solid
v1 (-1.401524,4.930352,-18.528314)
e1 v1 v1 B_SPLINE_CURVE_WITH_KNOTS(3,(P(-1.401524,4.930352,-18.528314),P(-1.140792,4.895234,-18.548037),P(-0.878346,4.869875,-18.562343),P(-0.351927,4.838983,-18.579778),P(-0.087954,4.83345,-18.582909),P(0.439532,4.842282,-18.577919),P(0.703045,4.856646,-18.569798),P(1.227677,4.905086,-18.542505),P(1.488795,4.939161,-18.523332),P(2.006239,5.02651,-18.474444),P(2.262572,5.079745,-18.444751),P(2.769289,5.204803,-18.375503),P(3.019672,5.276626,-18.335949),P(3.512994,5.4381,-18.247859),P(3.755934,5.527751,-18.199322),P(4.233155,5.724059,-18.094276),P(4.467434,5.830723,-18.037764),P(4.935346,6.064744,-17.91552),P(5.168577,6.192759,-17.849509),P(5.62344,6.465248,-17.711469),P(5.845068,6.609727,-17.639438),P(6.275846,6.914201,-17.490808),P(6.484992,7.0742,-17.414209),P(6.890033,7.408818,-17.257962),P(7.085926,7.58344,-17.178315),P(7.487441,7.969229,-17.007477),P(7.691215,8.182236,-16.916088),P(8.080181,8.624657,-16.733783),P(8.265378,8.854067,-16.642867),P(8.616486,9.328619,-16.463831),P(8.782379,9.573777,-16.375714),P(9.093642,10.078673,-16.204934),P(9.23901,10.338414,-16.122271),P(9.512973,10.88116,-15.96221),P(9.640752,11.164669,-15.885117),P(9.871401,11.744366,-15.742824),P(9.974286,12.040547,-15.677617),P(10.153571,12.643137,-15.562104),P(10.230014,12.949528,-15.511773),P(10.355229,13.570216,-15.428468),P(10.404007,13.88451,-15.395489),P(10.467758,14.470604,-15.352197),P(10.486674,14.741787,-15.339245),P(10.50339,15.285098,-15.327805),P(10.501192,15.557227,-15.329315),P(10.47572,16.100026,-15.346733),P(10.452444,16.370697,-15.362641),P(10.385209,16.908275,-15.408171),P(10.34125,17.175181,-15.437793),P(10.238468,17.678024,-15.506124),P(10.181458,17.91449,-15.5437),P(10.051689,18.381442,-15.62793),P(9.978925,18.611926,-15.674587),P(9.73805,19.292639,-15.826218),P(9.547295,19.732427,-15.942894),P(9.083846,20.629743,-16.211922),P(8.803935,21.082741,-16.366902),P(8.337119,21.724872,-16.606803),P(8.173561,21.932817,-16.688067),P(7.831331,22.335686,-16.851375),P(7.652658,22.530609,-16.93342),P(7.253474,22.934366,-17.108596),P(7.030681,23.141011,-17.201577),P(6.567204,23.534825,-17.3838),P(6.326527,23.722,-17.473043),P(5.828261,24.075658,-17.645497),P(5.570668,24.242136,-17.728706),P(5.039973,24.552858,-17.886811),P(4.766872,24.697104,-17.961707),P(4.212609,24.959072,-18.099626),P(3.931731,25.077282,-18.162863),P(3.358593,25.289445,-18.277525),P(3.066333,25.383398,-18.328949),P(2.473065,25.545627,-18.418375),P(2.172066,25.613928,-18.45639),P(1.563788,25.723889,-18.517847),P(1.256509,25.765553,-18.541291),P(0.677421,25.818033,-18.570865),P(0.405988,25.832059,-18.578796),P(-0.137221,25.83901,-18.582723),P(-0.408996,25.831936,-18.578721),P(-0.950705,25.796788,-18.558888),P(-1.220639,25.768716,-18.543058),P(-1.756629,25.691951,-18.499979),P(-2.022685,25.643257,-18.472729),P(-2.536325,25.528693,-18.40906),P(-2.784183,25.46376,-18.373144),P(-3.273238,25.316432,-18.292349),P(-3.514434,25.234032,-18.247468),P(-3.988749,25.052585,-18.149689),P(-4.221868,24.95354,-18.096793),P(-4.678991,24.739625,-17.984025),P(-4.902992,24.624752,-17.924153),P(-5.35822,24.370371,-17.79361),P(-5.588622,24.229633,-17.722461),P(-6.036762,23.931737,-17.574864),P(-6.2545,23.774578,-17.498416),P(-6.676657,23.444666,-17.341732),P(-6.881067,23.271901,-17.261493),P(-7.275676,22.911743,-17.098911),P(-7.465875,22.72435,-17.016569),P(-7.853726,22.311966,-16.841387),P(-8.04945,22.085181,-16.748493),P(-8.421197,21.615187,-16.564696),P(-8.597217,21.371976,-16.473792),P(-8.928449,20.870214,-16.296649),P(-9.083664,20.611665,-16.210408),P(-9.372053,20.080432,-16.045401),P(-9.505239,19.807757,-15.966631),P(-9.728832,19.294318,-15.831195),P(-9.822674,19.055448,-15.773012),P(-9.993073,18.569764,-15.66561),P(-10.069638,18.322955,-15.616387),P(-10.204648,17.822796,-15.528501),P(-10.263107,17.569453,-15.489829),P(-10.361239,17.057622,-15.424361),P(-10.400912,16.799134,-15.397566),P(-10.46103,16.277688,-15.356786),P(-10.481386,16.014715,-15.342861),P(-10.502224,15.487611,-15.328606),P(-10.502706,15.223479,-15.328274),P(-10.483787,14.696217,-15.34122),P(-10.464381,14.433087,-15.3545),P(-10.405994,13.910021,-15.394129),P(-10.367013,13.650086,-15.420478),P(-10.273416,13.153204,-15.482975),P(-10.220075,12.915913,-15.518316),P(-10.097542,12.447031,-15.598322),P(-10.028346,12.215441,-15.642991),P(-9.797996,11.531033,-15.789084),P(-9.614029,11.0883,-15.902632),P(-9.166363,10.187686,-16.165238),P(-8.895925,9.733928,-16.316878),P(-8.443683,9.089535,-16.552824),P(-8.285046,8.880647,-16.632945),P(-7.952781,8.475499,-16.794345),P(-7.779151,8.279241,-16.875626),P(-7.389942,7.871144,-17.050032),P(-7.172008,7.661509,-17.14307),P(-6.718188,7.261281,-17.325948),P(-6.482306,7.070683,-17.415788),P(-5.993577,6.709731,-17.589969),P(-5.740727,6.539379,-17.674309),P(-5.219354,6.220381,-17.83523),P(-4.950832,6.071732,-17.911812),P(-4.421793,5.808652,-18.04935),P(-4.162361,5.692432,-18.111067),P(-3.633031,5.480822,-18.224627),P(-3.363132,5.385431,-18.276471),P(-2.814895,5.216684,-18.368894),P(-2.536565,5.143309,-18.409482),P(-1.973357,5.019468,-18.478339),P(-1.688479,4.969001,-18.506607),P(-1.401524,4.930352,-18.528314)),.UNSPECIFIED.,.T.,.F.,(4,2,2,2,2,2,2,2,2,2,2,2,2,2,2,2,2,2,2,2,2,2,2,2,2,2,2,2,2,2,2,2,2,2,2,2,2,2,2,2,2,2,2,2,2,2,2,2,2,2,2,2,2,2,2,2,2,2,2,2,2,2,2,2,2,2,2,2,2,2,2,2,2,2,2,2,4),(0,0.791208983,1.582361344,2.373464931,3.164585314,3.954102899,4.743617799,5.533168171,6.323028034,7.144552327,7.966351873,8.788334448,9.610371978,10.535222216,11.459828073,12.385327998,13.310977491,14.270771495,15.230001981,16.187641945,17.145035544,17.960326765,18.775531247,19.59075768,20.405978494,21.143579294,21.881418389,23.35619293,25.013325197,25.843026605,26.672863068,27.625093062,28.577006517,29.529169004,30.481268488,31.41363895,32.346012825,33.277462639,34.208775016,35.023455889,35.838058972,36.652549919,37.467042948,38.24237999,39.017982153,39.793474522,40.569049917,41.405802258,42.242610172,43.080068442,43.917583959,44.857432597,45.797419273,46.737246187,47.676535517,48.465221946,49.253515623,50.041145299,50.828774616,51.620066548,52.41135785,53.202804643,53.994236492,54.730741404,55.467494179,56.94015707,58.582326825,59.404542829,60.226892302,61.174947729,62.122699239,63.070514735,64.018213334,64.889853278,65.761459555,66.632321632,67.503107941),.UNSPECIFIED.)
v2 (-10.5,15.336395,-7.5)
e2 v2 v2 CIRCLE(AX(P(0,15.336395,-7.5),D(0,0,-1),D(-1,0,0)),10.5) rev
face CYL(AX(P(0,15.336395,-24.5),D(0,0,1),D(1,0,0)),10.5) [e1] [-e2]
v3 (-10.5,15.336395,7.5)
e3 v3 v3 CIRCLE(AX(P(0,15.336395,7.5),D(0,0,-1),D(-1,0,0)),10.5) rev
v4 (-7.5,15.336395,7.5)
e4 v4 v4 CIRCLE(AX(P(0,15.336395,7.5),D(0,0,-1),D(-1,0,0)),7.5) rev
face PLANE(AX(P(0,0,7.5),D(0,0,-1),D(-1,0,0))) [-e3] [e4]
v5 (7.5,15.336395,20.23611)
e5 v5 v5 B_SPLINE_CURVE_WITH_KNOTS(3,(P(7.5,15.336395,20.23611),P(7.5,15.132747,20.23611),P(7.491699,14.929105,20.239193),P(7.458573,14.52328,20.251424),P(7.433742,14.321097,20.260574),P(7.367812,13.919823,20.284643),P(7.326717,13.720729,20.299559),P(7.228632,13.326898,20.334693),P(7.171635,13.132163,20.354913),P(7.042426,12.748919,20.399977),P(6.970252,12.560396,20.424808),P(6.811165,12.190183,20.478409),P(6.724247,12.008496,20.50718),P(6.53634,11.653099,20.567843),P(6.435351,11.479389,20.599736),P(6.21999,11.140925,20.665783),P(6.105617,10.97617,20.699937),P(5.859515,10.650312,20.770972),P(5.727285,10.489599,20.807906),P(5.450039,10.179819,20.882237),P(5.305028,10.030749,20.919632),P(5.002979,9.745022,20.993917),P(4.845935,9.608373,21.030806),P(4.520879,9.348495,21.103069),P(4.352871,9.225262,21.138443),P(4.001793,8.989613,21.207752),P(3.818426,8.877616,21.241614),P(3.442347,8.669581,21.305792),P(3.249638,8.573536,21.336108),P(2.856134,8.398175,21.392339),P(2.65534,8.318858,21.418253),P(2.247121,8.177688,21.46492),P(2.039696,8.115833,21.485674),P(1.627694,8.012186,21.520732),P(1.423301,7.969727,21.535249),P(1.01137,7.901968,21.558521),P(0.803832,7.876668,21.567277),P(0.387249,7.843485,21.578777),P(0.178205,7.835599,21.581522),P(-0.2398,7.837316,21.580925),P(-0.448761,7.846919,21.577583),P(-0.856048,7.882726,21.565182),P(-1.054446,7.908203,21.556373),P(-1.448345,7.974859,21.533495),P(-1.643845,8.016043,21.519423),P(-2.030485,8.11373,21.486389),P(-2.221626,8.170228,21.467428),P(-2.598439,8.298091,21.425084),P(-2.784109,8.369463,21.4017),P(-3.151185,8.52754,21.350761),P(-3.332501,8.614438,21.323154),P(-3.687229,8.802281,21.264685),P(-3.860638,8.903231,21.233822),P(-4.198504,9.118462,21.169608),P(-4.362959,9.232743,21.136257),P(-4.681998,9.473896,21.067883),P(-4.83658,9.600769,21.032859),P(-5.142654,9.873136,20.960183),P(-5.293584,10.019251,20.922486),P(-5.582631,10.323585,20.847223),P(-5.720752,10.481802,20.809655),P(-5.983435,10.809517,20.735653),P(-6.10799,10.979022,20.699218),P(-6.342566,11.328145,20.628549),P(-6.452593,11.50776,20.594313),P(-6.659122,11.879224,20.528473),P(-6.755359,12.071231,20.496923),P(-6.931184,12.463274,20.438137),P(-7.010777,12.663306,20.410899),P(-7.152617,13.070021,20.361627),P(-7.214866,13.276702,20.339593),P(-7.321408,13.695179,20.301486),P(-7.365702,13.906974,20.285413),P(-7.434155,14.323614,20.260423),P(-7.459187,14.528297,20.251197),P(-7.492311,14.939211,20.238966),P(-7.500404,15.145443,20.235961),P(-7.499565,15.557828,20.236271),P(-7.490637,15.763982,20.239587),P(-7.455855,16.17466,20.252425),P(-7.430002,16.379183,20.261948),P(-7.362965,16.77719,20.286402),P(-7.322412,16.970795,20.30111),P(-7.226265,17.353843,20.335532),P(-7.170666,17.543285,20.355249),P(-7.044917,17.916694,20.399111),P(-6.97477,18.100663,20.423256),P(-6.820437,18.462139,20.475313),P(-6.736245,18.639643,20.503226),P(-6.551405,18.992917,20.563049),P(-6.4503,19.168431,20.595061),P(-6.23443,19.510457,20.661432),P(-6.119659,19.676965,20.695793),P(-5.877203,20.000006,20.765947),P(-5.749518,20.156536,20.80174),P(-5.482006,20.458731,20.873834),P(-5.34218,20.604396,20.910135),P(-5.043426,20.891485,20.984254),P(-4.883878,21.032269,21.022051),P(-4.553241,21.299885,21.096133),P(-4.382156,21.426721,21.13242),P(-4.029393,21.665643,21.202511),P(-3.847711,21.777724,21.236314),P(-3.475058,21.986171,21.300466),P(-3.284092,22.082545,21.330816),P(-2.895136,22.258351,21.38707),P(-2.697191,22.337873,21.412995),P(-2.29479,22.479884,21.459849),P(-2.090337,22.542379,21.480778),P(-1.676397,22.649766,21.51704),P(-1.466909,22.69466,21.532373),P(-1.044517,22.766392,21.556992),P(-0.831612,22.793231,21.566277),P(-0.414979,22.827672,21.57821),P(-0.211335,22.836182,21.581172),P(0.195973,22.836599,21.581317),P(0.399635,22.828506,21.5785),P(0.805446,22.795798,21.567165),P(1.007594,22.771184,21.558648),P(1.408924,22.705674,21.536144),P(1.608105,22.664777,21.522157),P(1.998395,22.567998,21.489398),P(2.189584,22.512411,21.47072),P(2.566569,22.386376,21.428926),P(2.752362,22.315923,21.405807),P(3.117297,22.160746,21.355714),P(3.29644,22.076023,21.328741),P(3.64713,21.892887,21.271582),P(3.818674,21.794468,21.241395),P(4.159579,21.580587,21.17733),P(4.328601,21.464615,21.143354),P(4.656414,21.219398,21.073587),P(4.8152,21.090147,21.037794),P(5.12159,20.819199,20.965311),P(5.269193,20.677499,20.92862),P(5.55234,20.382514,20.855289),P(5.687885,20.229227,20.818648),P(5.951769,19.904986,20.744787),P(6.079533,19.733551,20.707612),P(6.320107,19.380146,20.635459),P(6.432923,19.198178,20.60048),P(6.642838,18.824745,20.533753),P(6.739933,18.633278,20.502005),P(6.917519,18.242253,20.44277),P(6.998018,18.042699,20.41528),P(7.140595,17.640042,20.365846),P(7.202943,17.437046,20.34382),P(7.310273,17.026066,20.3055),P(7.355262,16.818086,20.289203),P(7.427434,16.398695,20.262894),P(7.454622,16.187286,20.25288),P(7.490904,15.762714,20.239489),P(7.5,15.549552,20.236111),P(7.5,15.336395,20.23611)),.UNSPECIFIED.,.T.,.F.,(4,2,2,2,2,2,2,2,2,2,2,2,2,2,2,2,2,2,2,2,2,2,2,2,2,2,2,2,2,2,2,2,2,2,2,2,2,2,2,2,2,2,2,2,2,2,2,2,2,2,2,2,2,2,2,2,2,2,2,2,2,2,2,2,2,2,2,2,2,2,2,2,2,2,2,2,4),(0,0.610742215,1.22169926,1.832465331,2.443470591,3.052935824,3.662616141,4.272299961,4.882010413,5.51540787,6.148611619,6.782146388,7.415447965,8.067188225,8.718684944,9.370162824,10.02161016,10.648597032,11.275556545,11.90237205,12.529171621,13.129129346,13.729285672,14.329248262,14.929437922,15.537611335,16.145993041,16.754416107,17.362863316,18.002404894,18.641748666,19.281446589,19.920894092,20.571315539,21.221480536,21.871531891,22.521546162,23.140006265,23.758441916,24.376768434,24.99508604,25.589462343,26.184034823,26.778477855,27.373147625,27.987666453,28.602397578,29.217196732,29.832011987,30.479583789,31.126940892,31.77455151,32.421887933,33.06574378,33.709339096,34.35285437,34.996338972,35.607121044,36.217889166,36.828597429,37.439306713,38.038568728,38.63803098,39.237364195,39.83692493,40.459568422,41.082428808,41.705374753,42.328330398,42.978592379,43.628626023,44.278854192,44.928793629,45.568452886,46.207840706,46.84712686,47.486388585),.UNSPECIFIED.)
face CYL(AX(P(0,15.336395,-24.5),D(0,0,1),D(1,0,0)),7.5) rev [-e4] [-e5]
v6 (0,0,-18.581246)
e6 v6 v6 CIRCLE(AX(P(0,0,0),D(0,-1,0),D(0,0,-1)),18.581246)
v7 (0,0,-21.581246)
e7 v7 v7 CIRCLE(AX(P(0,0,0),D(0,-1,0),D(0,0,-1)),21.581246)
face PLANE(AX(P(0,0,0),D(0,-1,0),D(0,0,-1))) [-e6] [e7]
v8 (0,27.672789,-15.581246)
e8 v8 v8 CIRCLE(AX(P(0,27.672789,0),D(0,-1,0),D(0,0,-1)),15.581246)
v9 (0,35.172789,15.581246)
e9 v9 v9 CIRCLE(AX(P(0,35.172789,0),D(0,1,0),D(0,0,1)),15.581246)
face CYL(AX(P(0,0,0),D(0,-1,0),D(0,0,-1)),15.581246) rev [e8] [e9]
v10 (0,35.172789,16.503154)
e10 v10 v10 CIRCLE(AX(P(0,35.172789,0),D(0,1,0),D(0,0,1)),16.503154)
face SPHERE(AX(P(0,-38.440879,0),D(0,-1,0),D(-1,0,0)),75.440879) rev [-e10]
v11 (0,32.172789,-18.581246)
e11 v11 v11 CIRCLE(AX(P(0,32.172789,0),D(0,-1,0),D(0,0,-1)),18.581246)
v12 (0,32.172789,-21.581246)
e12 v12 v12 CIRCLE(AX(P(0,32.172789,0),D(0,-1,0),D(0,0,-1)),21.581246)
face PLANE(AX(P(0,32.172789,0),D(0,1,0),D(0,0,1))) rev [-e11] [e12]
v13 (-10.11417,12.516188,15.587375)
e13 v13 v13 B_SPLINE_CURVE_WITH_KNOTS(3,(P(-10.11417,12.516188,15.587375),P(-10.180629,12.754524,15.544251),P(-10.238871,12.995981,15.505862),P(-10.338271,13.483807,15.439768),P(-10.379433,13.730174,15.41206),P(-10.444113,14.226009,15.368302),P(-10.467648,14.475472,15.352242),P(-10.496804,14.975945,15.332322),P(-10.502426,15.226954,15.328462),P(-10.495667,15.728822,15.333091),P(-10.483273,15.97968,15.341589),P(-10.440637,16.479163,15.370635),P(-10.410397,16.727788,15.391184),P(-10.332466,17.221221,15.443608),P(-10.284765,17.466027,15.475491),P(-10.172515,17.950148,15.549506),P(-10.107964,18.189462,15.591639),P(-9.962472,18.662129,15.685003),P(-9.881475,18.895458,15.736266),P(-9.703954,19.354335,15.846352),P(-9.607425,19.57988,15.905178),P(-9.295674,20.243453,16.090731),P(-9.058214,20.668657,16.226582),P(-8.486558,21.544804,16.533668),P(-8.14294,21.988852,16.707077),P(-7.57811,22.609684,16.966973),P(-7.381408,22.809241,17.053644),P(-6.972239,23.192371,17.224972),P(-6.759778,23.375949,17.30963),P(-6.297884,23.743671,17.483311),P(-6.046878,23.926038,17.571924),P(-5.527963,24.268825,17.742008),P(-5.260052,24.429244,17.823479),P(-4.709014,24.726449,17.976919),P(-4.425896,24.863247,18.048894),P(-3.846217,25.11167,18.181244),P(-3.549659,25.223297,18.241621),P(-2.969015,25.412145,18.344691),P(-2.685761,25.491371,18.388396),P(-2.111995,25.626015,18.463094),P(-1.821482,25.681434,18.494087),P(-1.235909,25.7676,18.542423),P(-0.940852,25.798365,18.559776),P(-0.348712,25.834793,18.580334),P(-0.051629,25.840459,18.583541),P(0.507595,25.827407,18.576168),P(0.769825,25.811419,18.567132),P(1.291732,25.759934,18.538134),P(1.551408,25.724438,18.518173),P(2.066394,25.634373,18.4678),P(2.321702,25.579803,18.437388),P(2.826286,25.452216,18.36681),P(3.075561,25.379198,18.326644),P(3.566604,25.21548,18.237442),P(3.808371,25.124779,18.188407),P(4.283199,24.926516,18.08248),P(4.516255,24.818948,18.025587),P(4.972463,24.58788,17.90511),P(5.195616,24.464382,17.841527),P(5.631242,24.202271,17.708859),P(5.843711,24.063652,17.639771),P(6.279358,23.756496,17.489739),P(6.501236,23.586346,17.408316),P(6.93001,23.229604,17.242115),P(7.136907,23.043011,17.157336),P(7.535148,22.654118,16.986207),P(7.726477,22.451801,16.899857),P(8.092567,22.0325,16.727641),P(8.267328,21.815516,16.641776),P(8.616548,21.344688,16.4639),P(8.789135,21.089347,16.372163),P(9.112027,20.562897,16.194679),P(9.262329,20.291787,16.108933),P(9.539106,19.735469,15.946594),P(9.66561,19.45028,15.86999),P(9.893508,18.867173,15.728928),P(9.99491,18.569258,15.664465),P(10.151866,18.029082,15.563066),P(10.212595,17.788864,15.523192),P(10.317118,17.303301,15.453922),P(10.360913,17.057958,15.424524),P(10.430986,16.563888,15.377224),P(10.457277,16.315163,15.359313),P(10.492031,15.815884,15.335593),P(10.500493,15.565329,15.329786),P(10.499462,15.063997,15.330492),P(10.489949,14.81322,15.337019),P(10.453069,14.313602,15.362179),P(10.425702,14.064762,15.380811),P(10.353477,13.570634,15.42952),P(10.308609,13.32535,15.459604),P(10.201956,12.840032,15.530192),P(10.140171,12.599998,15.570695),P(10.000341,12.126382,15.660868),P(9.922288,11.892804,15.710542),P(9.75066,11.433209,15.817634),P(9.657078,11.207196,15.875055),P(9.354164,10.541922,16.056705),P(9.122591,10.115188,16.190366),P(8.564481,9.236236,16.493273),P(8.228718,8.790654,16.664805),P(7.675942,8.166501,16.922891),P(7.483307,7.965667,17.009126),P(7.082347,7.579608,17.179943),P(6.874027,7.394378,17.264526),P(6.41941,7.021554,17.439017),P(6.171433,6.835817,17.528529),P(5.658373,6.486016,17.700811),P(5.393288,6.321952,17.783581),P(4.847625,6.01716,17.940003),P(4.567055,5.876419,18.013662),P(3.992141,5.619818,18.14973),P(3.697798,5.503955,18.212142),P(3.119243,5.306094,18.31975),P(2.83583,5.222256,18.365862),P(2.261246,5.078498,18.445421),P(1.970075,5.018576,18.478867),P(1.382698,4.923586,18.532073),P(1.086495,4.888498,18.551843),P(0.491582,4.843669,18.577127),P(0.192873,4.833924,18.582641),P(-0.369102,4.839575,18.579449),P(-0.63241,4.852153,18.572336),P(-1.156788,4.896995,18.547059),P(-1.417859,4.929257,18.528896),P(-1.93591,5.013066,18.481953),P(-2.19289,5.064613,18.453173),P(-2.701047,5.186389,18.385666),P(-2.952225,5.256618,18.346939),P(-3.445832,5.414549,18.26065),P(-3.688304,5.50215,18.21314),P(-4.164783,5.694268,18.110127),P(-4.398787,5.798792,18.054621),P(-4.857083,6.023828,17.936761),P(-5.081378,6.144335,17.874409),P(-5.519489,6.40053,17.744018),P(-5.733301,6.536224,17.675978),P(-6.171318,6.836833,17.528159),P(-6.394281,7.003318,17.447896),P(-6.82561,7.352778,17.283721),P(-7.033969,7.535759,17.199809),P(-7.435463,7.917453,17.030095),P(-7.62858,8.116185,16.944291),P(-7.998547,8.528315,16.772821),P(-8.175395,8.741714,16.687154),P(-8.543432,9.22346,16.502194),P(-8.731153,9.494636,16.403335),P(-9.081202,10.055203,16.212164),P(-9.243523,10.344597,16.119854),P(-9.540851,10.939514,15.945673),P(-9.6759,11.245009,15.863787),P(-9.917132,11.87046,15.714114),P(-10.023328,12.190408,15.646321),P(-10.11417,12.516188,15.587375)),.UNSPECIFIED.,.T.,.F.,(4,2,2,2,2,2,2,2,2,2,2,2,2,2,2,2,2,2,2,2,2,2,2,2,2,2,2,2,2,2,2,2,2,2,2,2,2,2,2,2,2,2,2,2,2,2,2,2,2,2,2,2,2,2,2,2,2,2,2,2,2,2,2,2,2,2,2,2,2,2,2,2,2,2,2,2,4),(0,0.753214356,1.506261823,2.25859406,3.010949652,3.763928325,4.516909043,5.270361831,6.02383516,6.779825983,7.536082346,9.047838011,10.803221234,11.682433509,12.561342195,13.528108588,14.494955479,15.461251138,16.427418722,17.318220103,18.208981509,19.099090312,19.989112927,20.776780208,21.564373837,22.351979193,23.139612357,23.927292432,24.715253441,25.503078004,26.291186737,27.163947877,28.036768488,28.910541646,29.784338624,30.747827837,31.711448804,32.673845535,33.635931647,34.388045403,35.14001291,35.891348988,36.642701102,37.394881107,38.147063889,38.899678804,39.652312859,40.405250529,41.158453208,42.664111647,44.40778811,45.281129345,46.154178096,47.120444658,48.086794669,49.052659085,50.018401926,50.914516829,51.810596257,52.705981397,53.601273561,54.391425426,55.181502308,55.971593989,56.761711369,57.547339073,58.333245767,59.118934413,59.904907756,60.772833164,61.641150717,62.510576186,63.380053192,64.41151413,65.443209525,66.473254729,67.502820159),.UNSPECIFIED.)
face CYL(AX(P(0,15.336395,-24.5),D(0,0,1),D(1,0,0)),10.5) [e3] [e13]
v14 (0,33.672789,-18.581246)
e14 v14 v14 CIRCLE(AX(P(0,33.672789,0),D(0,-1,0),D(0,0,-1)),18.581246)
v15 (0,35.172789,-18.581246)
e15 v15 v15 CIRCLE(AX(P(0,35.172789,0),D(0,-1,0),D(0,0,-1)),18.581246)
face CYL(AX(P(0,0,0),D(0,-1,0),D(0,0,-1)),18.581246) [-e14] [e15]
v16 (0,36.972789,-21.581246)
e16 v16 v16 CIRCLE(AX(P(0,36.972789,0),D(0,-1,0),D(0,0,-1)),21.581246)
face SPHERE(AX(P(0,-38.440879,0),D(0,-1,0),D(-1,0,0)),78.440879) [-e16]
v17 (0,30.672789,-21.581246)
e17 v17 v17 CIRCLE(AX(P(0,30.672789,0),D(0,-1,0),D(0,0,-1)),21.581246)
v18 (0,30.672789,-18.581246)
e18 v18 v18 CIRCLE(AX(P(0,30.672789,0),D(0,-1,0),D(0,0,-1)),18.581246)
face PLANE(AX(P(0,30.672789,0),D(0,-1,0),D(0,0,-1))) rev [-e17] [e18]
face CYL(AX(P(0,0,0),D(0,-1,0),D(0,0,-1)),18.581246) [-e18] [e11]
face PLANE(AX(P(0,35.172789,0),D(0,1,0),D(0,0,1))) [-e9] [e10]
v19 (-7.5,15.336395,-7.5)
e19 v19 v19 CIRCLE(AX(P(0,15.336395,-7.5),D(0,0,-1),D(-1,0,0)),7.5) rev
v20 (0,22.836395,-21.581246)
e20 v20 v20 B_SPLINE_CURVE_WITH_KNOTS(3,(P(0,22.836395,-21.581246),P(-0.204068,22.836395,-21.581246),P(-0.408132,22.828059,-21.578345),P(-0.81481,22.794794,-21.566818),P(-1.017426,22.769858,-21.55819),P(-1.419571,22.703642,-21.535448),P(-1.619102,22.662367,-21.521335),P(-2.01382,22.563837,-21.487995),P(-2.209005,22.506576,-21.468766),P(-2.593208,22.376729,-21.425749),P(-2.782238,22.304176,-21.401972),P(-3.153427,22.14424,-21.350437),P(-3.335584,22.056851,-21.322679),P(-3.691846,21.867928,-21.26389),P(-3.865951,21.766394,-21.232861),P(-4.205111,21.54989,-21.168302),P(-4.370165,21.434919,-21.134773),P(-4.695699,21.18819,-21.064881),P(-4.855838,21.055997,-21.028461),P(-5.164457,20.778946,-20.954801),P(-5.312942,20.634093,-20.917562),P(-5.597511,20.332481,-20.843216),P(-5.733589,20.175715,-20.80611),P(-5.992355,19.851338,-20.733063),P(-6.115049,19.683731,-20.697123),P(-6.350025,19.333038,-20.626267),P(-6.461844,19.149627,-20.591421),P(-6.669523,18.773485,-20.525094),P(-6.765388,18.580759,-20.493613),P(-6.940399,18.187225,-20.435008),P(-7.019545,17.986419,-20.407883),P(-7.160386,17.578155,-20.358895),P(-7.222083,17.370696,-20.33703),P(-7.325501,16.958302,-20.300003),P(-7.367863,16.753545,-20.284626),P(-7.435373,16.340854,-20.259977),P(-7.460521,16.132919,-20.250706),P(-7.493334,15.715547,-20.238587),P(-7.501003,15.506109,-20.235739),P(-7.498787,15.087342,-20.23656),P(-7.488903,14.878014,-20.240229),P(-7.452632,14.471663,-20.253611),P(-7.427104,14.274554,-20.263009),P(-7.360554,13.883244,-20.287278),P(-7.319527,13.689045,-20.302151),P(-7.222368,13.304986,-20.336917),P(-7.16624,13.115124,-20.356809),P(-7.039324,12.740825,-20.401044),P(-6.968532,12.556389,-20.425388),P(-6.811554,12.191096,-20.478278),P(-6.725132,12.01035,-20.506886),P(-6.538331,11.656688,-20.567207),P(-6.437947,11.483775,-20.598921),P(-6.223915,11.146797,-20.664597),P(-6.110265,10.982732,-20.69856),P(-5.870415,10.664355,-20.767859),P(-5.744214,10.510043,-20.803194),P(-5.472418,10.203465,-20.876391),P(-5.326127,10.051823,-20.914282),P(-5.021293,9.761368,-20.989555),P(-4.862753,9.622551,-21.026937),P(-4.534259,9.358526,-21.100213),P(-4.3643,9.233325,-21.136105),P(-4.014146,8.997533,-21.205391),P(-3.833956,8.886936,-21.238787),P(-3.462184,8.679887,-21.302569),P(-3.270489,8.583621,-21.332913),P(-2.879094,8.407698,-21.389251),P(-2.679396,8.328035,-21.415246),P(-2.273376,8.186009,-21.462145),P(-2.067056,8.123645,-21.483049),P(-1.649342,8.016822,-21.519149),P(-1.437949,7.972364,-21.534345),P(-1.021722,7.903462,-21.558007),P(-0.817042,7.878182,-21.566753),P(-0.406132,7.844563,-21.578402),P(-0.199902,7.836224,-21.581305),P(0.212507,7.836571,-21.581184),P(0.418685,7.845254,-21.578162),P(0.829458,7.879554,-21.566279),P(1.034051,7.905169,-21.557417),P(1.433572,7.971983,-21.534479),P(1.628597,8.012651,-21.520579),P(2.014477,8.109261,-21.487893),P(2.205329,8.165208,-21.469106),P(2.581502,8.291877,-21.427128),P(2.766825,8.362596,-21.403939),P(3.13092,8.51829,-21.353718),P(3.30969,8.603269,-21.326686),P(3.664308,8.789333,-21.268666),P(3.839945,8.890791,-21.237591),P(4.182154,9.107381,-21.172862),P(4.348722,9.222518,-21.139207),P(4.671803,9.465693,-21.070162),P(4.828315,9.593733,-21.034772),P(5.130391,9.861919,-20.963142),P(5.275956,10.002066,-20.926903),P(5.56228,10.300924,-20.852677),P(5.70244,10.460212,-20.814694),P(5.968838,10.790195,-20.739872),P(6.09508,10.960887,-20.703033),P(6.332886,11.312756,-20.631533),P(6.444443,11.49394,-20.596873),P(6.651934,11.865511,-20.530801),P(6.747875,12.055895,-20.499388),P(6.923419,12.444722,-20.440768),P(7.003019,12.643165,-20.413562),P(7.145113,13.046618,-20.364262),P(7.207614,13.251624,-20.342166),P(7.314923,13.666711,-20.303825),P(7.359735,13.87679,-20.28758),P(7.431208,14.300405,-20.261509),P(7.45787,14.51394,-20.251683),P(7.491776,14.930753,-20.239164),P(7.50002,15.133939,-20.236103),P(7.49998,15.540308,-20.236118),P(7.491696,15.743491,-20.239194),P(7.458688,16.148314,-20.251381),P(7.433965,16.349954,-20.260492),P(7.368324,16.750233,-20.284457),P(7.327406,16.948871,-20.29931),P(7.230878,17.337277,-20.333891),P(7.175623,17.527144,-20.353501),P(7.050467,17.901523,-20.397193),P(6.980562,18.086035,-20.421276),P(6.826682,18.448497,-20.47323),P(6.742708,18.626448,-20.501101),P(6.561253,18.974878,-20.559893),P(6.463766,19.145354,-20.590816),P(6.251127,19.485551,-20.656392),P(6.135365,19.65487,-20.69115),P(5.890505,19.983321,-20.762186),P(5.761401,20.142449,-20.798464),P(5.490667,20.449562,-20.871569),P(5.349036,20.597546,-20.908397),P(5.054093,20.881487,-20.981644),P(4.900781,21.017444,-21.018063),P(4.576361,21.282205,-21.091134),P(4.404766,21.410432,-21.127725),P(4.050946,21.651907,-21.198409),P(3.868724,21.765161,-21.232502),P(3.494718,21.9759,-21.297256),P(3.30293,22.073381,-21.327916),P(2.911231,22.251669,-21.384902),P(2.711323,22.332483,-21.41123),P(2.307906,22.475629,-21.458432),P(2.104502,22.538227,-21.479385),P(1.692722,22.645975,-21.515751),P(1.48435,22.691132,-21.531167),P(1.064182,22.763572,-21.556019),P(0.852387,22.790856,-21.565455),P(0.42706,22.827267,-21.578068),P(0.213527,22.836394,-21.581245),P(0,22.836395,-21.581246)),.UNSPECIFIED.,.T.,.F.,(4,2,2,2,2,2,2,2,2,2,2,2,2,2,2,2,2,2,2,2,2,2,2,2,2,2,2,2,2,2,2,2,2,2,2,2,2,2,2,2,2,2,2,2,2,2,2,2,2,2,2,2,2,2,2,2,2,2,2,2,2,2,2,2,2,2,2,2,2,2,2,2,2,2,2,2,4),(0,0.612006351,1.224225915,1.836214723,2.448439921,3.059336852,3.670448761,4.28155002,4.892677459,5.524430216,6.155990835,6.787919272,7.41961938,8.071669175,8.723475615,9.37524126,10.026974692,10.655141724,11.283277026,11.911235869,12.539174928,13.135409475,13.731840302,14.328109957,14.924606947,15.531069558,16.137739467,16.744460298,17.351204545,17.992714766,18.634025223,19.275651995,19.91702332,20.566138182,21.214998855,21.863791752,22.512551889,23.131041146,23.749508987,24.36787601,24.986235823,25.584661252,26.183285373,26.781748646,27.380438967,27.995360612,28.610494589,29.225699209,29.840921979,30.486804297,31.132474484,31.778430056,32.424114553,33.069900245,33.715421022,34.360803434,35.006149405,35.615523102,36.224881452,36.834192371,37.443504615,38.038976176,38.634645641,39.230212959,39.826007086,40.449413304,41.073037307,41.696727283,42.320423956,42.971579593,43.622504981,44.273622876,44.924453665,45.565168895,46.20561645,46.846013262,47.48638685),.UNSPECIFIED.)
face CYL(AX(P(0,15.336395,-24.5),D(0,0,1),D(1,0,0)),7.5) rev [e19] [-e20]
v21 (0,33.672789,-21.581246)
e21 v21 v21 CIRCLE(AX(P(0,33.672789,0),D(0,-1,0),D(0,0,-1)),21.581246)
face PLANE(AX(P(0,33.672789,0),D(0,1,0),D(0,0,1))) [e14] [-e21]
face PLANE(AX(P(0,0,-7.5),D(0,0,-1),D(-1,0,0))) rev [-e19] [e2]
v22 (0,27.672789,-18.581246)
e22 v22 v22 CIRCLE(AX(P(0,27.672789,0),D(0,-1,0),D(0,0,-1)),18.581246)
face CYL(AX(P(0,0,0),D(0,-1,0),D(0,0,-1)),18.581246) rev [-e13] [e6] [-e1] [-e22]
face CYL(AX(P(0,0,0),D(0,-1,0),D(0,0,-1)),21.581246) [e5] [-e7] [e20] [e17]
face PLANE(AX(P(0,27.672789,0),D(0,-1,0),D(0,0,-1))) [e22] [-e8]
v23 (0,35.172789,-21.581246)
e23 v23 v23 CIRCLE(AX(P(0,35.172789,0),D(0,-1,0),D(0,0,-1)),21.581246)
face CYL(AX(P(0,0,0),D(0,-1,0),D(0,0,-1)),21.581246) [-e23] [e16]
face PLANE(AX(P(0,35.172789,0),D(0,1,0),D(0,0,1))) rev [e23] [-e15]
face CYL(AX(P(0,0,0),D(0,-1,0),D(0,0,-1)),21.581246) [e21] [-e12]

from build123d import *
from OCP.BRepAlgoAPI import BRepAlgoAPI_Cut
from OCP.TopTools import TopTools_ListOfShape

# Parameters (mm, degrees)
SKETCH1_W            = 18.581245514
SKETCH1_H            = 1.5
SKETCH2_R            = 7.5
CUT_EXTRUDE1_DEPTH   = 24.5
SHELL1_OUTLINE_R     = 18.581245514
SHELL1_DEPTH         = 27.672789125
SHELL1_START         = 27.672789125
SHELL1_2_OUTLINE_R   = 15.581245514
SHELL1_2_DEPTH       = 9.327210875
SHELL1_START_2       = 35.172789125
SHELL1_3_OUTLINE_R   = 18.581245514
SHELL1_3_OUTLINE_R_2 = 15.581245514
SHELL1_3_DEPTH       = 1.827210875
SHELL1_START_3       = -18.581245614
SHELL1_4_OUTLINE_R   = 10.5
SHELL1_4_OUTLINE_R_2 = 7.5
SHELL1_4_DEPTH       = 37.162490158
SKETCH3_W            = 25
SKETCH3_H            = 25
CUT_EXTRUDE2_DEPTH   = 7.5


with BuildPart() as part:
    # Sketch1 → Revolve1 (revolve)
    with BuildSketch(Plane.XY, mode=Mode.PRIVATE) as revolve1_sk:
        with BuildLine():
            Line((0, 40), (0, 36.972789125))
            Line((0, 36.972789125), (21.581245514, 36.972789125))
            ThreePointArc((21.581245514, 36.972789125), (10.896262703, 39.239510786), (0, 40))
        make_face()
        Polygon((0, 36.972789125), (0, 35.172789125), (18.581245514, 35.172789125), (21.581245514, 35.172789125), (21.581245514, 36.972789125), align=None)
        with Locations((9.290622757, 34.422789125)):
            Rectangle(SKETCH1_W, SKETCH1_H)
        Polygon((0, 33.672789125), (0, 32.172789125), (18.581245514, 32.172789125), (21.581245514, 32.172789125), (21.581245514, 33.672789125), (18.581245514, 33.672789125), align=None)
        with Locations((9.290622757, 31.422789125)):
            Rectangle(SKETCH1_W, SKETCH1_H)
        Polygon((0, 30.672789125), (0, 0), (21.581245514, 0), (21.581245514, 30.672789125), (18.581245514, 30.672789125), align=None)
    revolve(revolve1_sk.sketch.rotate(Axis((0, 0, 0), (0, 1, 0)), 90), axis=Axis((0, 0, 0), (0, 1, 0)))

    # Sketch2 → Cut-Extrude1 (cut, symmetric)
    with BuildSketch(Plane.XY):
        with Locations((0, 15.336394563)):
            Circle(SKETCH2_R)
    extrude(amount=CUT_EXTRUDE1_DEPTH, both=True, mode=Mode.SUBTRACT)


with BuildPart() as shell1_tool:
    # Shell1: read off the stored shape, not the designer's step
    # Shell1 outline → Shell1 (new body)
    with BuildSketch(Plane(origin=(0, 0, 0), x_dir=(1, 0, 0), z_dir=(0, 1, 0))):
        Circle(SHELL1_OUTLINE_R)
    extrude(amount=SHELL1_DEPTH)


with BuildPart() as part_1:
    add(part.part)

    # Shell1: cut by shell1_tool, with a tolerance
    shell1_stock = TopTools_ListOfShape()
    shell1_stock.Append(part_1.part.wrapped)
    shell1_tools = TopTools_ListOfShape()
    shell1_tools.Append(shell1_tool.part.wrapped)
    shell1_cut = BRepAlgoAPI_Cut()
    shell1_cut.SetArguments(shell1_stock)
    shell1_cut.SetTools(shell1_tools)
    shell1_cut.SetFuzzyValue(0.00001)
    shell1_cut.Build()
    add(Compound.cast(shell1_cut.Shape()).solids(), mode=Mode.REPLACE)


with BuildPart() as shell1_2_tool:
    # Shell1 2 outline → Shell1 2 (new body)
    with BuildSketch(Plane(origin=(0, 0, 0), x_dir=(1, 0, 0), z_dir=(0, 1, 0)).offset(SHELL1_START)):
        Circle(SHELL1_2_OUTLINE_R)
    extrude(amount=SHELL1_2_DEPTH)


with BuildPart() as part_2:
    add(part_1.part)

    # Shell1 2: cut by shell1_2_tool, with a tolerance
    shell1_2_stock = TopTools_ListOfShape()
    shell1_2_stock.Append(part_2.part.wrapped)
    shell1_2_tools = TopTools_ListOfShape()
    shell1_2_tools.Append(shell1_2_tool.part.wrapped)
    shell1_2_cut = BRepAlgoAPI_Cut()
    shell1_2_cut.SetArguments(shell1_2_stock)
    shell1_2_cut.SetTools(shell1_2_tools)
    shell1_2_cut.SetFuzzyValue(0.00001)
    shell1_2_cut.Build()
    add(Compound.cast(shell1_2_cut.Shape()).solids(), mode=Mode.REPLACE)


with BuildPart() as shell1_3_tool:
    # Shell1 3 outline → Shell1 3 (new body)
    with BuildSketch(Plane(origin=(0, 0, 0), x_dir=(1, 0, 0), z_dir=(0, 1, 0)).offset(SHELL1_START_2)):
        Circle(SHELL1_3_OUTLINE_R)
        Circle(SHELL1_3_OUTLINE_R_2, mode=Mode.SUBTRACT)
    extrude(amount=SHELL1_3_DEPTH)


with BuildPart() as part_3:
    add(part_2.part)

    # Shell1 3: cut by shell1_3_tool, with a tolerance
    shell1_3_stock = TopTools_ListOfShape()
    shell1_3_stock.Append(part_3.part.wrapped)
    shell1_3_tools = TopTools_ListOfShape()
    shell1_3_tools.Append(shell1_3_tool.part.wrapped)
    shell1_3_cut = BRepAlgoAPI_Cut()
    shell1_3_cut.SetArguments(shell1_3_stock)
    shell1_3_cut.SetTools(shell1_3_tools)
    shell1_3_cut.SetFuzzyValue(0.00001)
    shell1_3_cut.Build()
    add(Compound.cast(shell1_3_cut.Shape()).solids(), mode=Mode.REPLACE)


with BuildPart() as shell1_4_tool:
    # Shell1 4 outline → Shell1 4 (new body)
    with BuildSketch(Plane.XY.offset(SHELL1_START_3)):
        with Locations((0, 15.336394563)):
            Circle(SHELL1_4_OUTLINE_R)
        with Locations((0, 15.336394563)):
            Circle(SHELL1_4_OUTLINE_R_2, mode=Mode.SUBTRACT)
    extrude(amount=SHELL1_4_DEPTH)


with BuildPart() as part_4:
    add(part_3.part)


with BuildPart() as part_5:
    # Shell1 4: joined with shell1_4_tool
    add(part_4.part.fuse(shell1_4_tool.part, tol=0.00001))


with BuildPart() as shell1_5_tool:
    # Shell1 5 outline → Shell1 5 (revolve)
    with BuildSketch(Plane.XY):
        with BuildLine():
            Line((18.581245514, 37), (0, 37))
            ThreePointArc((0, 37), (8.301999629, 36.541805844), (16.503153993, 35.172789109))
            Line((16.503153993, 35.172789109), (18.581245514, 35.172789109))
            Line((18.581245514, 35.172789109), (18.581245514, 37))
        make_face()
    revolve(axis=Axis((0, 0, 0), (0, 1, 0)))


with BuildPart() as part_6:
    add(part_5.part)


with BuildPart() as part_7:
    # Shell1 5: joined with shell1_5_tool
    add(part_6.part.fuse(shell1_5_tool.part, tol=0.00001))

    # Sketch3 → Cut-Extrude2 (cut, symmetric)
    with BuildSketch(Plane.XY):
        with Locations((0, 15.336394563)):
            Rectangle(SKETCH3_W, SKETCH3_H)
    extrude(amount=CUT_EXTRUDE2_DEPTH, both=True, mode=Mode.SUBTRACT)


solid = part_7.part
